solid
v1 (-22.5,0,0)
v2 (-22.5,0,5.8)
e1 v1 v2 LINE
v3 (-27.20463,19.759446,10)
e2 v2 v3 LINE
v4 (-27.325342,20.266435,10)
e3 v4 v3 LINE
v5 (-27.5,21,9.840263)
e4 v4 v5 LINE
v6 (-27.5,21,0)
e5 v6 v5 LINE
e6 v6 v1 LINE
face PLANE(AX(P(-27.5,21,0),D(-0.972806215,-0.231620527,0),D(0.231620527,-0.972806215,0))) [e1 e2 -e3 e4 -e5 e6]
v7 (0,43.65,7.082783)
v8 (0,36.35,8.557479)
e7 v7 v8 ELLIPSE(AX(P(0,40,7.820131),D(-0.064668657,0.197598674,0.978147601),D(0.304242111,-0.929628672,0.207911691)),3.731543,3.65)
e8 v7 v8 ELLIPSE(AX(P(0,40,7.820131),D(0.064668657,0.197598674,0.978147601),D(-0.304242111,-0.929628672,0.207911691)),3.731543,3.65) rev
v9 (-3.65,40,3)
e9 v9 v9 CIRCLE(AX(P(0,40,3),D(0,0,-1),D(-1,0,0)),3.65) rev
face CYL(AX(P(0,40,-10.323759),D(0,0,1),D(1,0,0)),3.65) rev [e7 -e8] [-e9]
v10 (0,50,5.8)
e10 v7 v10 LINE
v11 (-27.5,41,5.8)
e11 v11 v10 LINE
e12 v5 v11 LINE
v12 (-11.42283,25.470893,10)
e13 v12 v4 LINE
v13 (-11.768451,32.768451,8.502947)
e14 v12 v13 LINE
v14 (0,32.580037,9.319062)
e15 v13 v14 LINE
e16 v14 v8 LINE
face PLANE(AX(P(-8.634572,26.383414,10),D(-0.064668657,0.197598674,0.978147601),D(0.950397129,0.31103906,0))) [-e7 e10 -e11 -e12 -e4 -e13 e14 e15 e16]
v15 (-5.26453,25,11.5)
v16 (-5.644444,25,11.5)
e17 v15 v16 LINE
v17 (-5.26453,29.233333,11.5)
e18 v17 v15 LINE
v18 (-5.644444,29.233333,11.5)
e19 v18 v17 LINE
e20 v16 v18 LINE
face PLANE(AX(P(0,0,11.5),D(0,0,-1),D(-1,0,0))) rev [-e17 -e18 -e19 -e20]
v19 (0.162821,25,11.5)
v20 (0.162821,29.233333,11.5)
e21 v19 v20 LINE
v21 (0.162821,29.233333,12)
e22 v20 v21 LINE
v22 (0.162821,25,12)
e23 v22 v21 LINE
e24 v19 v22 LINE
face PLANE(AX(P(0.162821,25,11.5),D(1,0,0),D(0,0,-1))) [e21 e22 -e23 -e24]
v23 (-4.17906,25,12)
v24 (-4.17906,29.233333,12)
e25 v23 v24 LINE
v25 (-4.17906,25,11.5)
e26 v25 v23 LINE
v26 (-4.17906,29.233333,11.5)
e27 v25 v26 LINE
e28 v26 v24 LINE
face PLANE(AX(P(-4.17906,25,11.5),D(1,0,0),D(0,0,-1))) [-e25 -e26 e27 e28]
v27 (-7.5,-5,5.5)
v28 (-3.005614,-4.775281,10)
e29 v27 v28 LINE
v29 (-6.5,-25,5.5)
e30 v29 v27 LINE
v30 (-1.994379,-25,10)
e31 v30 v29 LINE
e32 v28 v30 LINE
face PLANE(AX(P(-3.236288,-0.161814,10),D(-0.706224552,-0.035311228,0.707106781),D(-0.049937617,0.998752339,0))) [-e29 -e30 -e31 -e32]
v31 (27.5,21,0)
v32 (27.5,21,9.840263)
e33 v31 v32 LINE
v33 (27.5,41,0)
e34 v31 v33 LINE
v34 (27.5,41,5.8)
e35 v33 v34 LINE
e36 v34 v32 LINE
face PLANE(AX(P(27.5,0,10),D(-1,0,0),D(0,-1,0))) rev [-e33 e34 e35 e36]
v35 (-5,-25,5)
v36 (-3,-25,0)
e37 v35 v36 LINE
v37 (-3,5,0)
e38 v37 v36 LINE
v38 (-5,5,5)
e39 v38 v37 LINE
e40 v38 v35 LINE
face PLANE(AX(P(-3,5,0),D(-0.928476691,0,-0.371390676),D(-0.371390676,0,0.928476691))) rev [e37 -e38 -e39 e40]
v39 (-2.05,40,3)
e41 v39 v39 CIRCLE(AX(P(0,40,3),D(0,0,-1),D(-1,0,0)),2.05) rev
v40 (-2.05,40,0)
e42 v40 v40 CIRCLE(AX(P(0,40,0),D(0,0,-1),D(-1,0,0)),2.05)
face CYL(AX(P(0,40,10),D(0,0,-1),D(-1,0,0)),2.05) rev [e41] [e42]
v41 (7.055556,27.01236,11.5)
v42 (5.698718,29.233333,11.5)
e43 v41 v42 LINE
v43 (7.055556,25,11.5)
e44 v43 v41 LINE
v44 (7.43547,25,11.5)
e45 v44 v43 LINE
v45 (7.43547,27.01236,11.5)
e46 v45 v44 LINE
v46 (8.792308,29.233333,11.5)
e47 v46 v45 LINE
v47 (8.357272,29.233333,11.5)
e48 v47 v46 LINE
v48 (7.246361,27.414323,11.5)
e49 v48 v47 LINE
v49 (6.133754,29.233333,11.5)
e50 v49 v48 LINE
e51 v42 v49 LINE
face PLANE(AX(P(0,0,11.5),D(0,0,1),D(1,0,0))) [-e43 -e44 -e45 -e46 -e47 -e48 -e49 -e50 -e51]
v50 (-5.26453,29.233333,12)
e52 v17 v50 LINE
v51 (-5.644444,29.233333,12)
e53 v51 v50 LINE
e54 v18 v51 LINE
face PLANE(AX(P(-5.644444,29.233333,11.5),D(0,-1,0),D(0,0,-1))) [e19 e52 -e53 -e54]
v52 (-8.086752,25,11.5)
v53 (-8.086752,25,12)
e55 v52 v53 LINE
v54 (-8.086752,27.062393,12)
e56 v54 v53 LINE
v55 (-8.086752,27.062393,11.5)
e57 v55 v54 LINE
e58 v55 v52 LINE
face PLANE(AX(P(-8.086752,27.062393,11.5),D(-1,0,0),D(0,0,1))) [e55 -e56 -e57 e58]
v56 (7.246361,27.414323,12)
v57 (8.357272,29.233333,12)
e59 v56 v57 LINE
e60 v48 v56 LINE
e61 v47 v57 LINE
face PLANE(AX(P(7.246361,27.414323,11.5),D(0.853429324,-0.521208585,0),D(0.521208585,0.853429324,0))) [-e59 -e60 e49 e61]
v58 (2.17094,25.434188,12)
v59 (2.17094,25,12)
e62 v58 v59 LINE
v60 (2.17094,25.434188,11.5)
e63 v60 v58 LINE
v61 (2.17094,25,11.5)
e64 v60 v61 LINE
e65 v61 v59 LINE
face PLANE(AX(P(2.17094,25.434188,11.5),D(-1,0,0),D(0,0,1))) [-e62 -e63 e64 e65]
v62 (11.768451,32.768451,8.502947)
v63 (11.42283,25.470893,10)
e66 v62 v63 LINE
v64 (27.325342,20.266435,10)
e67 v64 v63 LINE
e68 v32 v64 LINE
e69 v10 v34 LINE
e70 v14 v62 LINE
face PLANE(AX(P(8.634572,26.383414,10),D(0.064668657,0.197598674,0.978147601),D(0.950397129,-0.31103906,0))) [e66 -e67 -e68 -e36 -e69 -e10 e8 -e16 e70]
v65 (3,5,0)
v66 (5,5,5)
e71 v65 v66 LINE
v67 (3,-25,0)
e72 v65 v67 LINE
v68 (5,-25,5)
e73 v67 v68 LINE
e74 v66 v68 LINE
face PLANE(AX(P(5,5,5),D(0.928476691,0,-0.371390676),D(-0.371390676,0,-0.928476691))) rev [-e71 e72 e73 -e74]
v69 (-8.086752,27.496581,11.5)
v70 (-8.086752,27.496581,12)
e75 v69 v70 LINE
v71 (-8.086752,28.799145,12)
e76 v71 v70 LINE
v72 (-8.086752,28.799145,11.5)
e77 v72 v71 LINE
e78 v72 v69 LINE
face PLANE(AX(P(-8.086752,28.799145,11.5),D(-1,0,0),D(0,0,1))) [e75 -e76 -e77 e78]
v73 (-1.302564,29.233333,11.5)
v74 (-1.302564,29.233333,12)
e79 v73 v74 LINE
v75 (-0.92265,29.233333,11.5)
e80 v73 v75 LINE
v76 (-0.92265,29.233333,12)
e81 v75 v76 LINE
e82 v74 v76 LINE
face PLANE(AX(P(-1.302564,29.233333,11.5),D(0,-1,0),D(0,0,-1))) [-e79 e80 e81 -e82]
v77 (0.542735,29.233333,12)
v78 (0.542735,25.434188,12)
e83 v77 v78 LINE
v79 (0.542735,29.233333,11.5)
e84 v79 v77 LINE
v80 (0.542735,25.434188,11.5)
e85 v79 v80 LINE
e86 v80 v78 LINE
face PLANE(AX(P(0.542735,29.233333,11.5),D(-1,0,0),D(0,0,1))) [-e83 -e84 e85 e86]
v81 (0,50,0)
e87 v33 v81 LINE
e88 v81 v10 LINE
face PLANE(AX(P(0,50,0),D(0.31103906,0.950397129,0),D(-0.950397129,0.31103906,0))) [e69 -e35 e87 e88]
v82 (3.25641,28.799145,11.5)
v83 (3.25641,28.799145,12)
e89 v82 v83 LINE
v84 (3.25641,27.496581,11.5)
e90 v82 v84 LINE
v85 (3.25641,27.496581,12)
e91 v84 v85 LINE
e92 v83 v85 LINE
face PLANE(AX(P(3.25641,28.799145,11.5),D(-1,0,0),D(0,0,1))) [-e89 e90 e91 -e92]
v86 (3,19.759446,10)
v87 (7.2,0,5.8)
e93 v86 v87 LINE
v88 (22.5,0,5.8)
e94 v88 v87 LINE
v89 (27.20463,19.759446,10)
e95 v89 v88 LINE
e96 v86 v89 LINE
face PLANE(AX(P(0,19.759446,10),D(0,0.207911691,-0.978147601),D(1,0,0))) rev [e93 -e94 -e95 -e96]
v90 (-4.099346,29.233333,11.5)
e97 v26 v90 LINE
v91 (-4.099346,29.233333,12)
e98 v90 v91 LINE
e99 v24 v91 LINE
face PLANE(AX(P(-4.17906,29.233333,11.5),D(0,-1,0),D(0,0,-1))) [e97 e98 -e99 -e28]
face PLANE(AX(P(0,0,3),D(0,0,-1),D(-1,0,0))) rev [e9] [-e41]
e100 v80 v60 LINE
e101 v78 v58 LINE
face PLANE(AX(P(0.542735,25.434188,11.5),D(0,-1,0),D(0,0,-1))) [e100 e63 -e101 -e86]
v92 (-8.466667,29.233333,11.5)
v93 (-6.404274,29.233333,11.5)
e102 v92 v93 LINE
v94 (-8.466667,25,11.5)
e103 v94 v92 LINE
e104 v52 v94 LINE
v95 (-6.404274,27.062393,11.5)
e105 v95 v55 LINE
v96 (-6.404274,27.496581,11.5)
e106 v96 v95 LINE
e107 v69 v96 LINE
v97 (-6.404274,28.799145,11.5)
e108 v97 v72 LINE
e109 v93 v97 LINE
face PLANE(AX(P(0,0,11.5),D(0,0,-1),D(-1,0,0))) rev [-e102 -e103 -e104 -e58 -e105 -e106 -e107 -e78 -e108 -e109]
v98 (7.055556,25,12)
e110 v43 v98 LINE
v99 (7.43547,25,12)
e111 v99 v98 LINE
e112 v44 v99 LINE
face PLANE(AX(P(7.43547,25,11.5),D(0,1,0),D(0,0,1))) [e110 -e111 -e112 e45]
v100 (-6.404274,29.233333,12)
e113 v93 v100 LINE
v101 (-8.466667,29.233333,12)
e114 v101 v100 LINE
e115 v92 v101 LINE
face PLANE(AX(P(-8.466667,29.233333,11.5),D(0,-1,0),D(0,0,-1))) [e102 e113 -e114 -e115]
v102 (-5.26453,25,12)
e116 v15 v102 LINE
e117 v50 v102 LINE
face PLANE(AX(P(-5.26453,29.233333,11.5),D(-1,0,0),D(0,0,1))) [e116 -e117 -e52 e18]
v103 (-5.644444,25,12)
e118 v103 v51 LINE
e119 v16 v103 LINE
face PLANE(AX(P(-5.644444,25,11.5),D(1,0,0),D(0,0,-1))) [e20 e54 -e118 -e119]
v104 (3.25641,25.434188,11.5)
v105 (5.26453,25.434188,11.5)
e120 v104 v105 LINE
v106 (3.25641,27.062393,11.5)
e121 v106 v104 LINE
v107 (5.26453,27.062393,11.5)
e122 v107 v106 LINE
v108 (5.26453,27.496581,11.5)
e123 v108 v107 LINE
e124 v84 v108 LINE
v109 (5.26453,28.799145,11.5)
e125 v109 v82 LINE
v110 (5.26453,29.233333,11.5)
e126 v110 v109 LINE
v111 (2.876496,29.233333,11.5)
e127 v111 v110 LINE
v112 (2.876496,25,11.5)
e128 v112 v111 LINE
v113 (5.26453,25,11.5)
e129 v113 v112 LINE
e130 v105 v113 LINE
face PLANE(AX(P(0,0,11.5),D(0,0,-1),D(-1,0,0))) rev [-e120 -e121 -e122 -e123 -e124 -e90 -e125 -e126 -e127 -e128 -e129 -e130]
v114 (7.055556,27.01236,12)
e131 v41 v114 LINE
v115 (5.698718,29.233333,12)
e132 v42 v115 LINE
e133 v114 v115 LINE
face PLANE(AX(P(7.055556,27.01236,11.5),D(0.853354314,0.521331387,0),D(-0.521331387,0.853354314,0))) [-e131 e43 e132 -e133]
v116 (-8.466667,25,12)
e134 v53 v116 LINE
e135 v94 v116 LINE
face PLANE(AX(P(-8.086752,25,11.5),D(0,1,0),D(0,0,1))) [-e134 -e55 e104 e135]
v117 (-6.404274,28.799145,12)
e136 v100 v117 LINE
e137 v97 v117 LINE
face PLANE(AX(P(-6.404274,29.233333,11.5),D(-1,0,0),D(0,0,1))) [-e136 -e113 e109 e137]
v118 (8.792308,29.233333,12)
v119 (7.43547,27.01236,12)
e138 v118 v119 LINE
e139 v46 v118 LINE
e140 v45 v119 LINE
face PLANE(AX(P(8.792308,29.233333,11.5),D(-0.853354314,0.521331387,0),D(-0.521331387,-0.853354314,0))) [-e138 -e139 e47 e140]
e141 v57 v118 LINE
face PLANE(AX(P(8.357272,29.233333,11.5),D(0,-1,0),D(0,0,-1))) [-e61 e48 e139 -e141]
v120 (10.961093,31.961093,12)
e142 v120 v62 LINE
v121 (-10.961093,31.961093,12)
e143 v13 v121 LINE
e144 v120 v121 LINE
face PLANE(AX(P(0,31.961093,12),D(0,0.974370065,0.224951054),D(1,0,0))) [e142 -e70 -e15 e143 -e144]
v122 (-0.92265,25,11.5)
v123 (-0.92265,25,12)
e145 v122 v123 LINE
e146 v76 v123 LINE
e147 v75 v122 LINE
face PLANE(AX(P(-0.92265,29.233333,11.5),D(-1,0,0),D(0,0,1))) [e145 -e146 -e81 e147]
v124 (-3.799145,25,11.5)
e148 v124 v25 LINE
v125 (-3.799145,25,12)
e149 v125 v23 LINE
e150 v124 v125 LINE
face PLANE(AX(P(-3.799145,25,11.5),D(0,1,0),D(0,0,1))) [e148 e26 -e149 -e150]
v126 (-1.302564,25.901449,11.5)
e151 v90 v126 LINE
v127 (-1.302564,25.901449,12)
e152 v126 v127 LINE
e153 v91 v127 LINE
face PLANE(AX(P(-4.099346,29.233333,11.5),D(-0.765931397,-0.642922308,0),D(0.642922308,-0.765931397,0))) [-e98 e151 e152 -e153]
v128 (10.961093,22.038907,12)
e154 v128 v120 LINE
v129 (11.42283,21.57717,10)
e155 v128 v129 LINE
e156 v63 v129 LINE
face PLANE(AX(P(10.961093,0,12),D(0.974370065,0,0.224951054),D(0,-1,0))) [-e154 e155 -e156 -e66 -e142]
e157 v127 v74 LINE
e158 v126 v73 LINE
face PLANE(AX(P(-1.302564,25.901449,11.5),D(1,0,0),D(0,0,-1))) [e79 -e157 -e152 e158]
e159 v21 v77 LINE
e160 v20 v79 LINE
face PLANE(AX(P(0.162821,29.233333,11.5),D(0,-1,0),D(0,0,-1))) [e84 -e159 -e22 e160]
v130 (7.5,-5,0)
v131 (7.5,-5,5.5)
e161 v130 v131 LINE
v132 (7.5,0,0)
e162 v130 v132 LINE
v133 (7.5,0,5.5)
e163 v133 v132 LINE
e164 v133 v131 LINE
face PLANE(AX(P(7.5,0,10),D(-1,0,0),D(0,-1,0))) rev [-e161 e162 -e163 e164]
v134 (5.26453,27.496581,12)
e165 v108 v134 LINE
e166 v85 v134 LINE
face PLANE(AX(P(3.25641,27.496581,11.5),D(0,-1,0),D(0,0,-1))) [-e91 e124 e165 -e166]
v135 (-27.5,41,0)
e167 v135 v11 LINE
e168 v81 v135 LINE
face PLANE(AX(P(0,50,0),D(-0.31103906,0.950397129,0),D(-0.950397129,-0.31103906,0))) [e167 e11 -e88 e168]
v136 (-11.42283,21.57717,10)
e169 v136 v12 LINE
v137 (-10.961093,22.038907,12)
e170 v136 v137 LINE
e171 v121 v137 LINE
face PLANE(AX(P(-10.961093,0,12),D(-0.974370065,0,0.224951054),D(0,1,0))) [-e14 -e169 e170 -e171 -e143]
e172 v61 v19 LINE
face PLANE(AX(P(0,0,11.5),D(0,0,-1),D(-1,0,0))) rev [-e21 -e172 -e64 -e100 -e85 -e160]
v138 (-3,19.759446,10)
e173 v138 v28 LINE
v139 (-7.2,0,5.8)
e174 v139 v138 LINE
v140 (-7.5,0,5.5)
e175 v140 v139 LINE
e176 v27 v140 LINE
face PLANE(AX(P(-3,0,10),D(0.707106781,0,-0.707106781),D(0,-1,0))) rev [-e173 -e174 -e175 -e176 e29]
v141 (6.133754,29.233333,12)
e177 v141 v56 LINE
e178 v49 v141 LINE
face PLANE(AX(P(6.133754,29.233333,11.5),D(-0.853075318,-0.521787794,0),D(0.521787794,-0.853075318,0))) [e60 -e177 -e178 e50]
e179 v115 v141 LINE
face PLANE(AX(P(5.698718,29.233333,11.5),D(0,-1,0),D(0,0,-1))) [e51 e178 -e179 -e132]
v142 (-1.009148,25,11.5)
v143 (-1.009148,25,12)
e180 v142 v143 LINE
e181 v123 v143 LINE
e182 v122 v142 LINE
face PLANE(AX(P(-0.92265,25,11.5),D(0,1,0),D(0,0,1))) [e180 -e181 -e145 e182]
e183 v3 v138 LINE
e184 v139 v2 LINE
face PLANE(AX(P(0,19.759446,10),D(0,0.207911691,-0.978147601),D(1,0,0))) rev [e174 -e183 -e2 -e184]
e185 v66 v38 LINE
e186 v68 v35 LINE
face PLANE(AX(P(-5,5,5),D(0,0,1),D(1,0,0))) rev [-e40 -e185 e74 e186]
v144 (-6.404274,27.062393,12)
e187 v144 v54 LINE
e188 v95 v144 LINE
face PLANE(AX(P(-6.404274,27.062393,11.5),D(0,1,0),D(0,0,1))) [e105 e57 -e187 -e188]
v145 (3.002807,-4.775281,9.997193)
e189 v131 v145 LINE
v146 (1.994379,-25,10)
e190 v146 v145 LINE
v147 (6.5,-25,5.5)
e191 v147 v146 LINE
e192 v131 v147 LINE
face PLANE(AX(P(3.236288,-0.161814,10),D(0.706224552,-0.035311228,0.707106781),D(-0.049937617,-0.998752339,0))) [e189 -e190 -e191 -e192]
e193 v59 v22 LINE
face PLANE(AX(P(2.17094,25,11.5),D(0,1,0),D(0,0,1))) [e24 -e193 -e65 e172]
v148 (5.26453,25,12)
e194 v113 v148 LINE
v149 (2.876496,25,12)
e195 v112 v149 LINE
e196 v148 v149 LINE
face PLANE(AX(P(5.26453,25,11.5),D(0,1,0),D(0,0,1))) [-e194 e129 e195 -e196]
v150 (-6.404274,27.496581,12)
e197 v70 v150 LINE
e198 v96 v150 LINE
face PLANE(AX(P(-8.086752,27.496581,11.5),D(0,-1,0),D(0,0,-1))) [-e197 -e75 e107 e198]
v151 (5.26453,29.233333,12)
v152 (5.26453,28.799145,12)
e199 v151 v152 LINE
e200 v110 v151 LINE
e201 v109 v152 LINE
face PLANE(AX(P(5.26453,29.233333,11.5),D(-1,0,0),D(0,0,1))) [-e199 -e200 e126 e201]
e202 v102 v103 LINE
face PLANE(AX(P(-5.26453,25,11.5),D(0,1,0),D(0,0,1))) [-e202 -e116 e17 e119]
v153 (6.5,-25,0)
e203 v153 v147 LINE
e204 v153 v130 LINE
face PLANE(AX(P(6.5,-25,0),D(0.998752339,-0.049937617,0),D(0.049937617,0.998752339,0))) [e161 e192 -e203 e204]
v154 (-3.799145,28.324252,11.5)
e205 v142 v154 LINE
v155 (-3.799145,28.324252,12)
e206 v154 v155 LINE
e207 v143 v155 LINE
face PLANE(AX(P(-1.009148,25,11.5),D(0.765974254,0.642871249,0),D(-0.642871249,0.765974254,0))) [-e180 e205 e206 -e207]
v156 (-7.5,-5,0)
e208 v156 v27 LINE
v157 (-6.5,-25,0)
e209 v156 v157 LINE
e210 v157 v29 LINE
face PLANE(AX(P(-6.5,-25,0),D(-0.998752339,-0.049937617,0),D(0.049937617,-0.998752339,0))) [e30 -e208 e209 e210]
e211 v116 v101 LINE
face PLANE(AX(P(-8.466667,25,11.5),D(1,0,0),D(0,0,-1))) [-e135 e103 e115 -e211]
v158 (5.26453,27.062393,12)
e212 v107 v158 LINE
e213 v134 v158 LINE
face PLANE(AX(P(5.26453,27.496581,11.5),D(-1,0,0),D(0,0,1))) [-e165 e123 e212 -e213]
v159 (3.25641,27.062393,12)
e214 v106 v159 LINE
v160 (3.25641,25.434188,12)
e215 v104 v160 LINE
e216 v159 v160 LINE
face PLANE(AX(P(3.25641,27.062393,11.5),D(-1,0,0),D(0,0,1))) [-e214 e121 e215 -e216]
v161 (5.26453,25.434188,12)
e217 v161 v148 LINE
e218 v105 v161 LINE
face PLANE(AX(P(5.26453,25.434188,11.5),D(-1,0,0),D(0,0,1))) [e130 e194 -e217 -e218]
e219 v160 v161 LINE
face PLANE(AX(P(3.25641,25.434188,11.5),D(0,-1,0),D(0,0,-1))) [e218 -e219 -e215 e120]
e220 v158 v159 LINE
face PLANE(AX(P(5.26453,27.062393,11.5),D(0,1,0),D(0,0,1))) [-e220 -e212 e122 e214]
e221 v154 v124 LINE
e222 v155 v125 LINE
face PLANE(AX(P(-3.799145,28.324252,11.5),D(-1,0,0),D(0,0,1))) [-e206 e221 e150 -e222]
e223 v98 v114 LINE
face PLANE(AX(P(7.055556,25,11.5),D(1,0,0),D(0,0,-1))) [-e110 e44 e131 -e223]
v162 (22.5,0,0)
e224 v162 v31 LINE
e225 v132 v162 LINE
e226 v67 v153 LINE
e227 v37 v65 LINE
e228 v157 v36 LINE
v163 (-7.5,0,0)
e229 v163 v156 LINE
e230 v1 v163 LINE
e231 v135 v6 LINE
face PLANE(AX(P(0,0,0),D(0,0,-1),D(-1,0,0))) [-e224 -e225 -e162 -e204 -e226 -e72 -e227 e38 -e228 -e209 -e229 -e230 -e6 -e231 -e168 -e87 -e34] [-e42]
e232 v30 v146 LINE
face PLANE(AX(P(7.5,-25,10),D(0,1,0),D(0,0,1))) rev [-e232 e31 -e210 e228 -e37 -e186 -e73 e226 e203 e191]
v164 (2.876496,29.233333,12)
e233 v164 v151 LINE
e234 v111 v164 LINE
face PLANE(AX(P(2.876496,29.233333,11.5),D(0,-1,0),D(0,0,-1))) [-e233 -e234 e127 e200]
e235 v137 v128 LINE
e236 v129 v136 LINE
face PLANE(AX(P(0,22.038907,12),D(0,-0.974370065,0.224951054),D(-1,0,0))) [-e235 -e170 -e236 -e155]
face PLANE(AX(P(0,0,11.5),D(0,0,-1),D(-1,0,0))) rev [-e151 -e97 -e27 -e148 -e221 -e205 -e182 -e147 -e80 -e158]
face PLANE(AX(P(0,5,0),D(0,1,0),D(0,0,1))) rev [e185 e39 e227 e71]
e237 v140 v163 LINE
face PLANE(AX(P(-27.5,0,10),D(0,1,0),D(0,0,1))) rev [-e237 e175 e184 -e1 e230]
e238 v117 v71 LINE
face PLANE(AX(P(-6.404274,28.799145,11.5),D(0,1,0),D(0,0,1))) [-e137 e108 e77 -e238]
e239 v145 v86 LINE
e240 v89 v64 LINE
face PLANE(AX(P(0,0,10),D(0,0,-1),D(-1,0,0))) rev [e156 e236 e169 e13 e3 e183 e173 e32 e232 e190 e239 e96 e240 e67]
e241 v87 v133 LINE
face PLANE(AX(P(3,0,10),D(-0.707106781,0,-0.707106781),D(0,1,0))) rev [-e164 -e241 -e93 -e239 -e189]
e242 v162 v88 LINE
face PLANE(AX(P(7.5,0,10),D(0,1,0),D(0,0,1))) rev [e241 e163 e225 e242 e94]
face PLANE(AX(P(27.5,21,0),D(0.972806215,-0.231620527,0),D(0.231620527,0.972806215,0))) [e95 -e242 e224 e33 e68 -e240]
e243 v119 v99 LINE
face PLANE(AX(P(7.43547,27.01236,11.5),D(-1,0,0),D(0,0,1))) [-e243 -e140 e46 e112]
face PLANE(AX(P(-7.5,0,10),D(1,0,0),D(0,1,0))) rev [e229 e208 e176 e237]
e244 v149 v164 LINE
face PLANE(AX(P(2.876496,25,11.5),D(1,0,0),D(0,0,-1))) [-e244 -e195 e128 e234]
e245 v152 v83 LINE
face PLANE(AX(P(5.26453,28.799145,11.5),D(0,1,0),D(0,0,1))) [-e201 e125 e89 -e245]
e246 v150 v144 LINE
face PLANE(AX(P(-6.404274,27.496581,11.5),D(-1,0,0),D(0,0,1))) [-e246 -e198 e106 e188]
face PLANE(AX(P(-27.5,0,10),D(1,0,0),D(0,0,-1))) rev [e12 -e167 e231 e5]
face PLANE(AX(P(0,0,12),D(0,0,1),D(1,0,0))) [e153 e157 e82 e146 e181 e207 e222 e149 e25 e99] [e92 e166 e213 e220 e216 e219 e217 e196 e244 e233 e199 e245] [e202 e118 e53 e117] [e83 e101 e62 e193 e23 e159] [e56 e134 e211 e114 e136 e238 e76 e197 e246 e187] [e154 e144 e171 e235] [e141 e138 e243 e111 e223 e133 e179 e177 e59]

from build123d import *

# Parameters (mm, degrees)
BOSS_EXTRUDE1_DEPTH  = 10
SKETCH3_OUTSIDE_W    = 75.708
SKETCH3_OUTSIDE_H    = 95.708
SHAPE_CUTS_DEPTH     = 58.933151131
DOVE_TAIL_DEPTH      = 30
SKETCH5_R            = 2.05
FASTENER_DEPTH       = 58.933151131
SKETCH7_R            = 3.65
CUT_EXTRUDE4_DEPTH   = 7
SKETCH8_W            = 24
SKETCH8_H            = 12
NAMES_PLATE_DEPTH    = 2
CHAMFER1_SIZE        = 4.2
CHAMFER1_SIZE_2      = 19.75944646
CHAMFER2_SIZE        = 4.5
CHAMFER3_SIZE        = 4.5
CHAMFER3_SIZE_2      = 1.03890686
SKETCH9_W            = 0.379914529
SKETCH9_H            = 4.233333333
AVA_NAME_PRINT_DEPTH = 0.5


with BuildPart() as part:
    # Sketch2 → Boss-Extrude1 (new body)
    with BuildSketch(Plane.XY):
        Polygon((7.5, 0), (27.5, 0), (27.5, 50), (-27.5, 50), (-27.5, 0), (-7.5, 0), (-7.5, -25), (7.5, -25), align=None)
    extrude(amount=BOSS_EXTRUDE1_DEPTH)

    # Sketch3 outside → Shape cuts (cut, through all)
    with BuildSketch(Plane.XY.offset(10)):
        with Locations((0, 12.5)):
            Rectangle(SKETCH3_OUTSIDE_W, SKETCH3_OUTSIDE_H)
        Polygon((-6.5, -25), (-7.5, -5), (-7.5, 0), (-22.5, 0), (-27.5, 21), (-27.5, 41), (0, 50), (27.5, 41), (27.5, 21), (22.5, 0), (7.5, 0), (7.5, -5), (6.5, -25), align=None, mode=Mode.SUBTRACT)
    extrude(amount=-SHAPE_CUTS_DEPTH, mode=Mode.SUBTRACT)

    # Sketch4 → Dove tail (cut)
    with BuildSketch(Plane.XZ.offset(25)):
        Polygon((-5, 5), (5, 5), (3, 0), (-3, 0), align=None)
    extrude(amount=-DOVE_TAIL_DEPTH, mode=Mode.SUBTRACT)

    # Sketch5 → Fastener (cut, through all)
    with BuildSketch(Plane(origin=(0, 0, 0), x_dir=(-1, 0, 0), z_dir=(0, 0, -1))):
        with Locations((0, 40)):
            Circle(SKETCH5_R)
    extrude(amount=-FASTENER_DEPTH, mode=Mode.SUBTRACT)

    # Sketch7 → Cut-Extrude4 (cut)
    with BuildSketch(Plane.XY.offset(10)):
        with Locations((0, 40)):
            Circle(SKETCH7_R)
    extrude(amount=-CUT_EXTRUDE4_DEPTH, mode=Mode.SUBTRACT)

    # Sketch8 → Names Plate (add)
    with BuildSketch(Plane.XY.offset(10)):
        with Locations((0, 27)):
            Rectangle(SKETCH8_W, SKETCH8_H)
    extrude(amount=NAMES_PLATE_DEPTH)

    # Chamfer1
    # the kernel refuses this chamfer: 19.75944646, 4.2 mm, written as the material it takes off along each edge
    with BuildSketch(Plane(origin=(-43.83302561, 0, 10), x_dir=(0, -0.17442650951506392, -0.9846701949274139), z_dir=(1, 0, 0))) as chamfer1_piece_1_section:
        Polygon((CHAMFER1_SIZE * 0.984670194927, CHAMFER1_SIZE * 0.174426509515), (-CHAMFER1_SIZE_2 * 0.174426509513, CHAMFER1_SIZE_2 * 0.984670194918), (0, 0), align=None)
    chamfer1_piece_1 = extrude(amount=117.66605122, mode=Mode.PRIVATE)
    chamfer1_piece_1 = split(chamfer1_piece_1, bisect_by=Plane(origin=(-7.5, 6.987243294, 8.814531777), z_dir=(-1, 0, 0)), keep=Keep.TOP, mode=Mode.PRIVATE)
    add(chamfer1_piece_1, mode=Mode.SUBTRACT)
    with BuildSketch(Plane(origin=(7.5, 0, 10), x_dir=(0, -0.17442650951506392, -0.9846701949274139), z_dir=(1, 0, 0))) as chamfer1_piece_2:
        Polygon((CHAMFER1_SIZE * 0.984670194927, CHAMFER1_SIZE * 0.174426509515), (-CHAMFER1_SIZE_2 * 0.174426509513, CHAMFER1_SIZE_2 * 0.984670194918), (0, 0), align=None)
    extrude(amount=66.33302561, mode=Mode.SUBTRACT)
    with BuildSketch(Plane(origin=(-73.83302561, 0, 10), x_dir=(0, 0.9999679748920759, 0.008003073799517023), z_dir=(1, 0, 0))) as chamfer1_piece_3:
        Polygon((CHAMFER1_SIZE_2 * 0.999967974882, -CHAMFER1_SIZE_2 * 0.00800307379944), (-CHAMFER1_SIZE * 0.00800307379952, -CHAMFER1_SIZE * 0.999967974892), (0, 0), align=None)
    extrude(amount=66.33302561, mode=Mode.SUBTRACT)
    with BuildSketch(Plane(origin=(-73.83302561, 0, 10), x_dir=(0, 0.9999679748920759, 0.008003073799517023), z_dir=(1, 0, 0))) as chamfer1_piece_4_section:
        Polygon((CHAMFER1_SIZE_2 * 0.999967974882, -CHAMFER1_SIZE_2 * 0.00800307379944), (-CHAMFER1_SIZE * 0.00800307379952, -CHAMFER1_SIZE * 0.999967974892), (0, 0), align=None)
    chamfer1_piece_4 = extrude(amount=117.66605122, mode=Mode.PRIVATE)
    chamfer1_piece_4 = split(chamfer1_piece_4, bisect_by=Plane(origin=(7.5, 6.987243294, 8.814531777), z_dir=(1, 0, 0)), keep=Keep.TOP, mode=Mode.PRIVATE)
    add(chamfer1_piece_4, mode=Mode.SUBTRACT)
    with BuildSketch(Plane(origin=(-76.286760165, 25.033423946, 10), x_dir=(0.3110290993551473, -0.9503666924740605, 0.008003073799517025), z_dir=(0.9503971290446889, 0.31103906041462565, 0))) as chamfer1_piece_5_section:
        Polygon((CHAMFER1_SIZE_2 * 0.999967974882, CHAMFER1_SIZE_2 * 0.00800307379944), (-CHAMFER1_SIZE * 0.00800307379952, CHAMFER1_SIZE * 0.999967974892), (0, 0), align=None)
    chamfer1_piece_5 = extrude(amount=131.601323812, mode=Mode.PRIVATE)
    chamfer1_piece_5 = split(chamfer1_piece_5, bisect_by=Plane(origin=(-50.474654782, 33, 8.986769107), z_dir=(0, -1, 0)), keep=Keep.TOP, mode=Mode.PRIVATE)
    chamfer1_piece_5 = split(chamfer1_piece_5, bisect_by=Plane(origin=(-12, 24.582378236, 8.986769107), z_dir=(-1, 0, 0)), keep=Keep.TOP, mode=Mode.PRIVATE)
    add(chamfer1_piece_5, mode=Mode.SUBTRACT)
    with BuildSketch(Plane(origin=(-76.286760165, 25.033423946, 10), x_dir=(0.3110290993551473, -0.9503666924740605, 0.008003073799517025), z_dir=(0.9503971290446889, 0.31103906041462565, 0))) as chamfer1_piece_6_section:
        Polygon((CHAMFER1_SIZE_2 * 0.999967974882, CHAMFER1_SIZE_2 * 0.00800307379944), (-CHAMFER1_SIZE * 0.00800307379952, CHAMFER1_SIZE * 0.999967974892), (0, 0), align=None)
    chamfer1_piece_6 = extrude(amount=131.601323812, mode=Mode.PRIVATE)
    chamfer1_piece_6 = split(chamfer1_piece_6, bisect_by=Plane(origin=(-26.699133226, 33, 8.380574439), z_dir=(0, 1, 0)), keep=Keep.TOP, mode=Mode.PRIVATE)
    chamfer1_piece_6 = split(chamfer1_piece_6, bisect_by=Plane(origin=(-12, 37.810625419, 8.380574439), z_dir=(-1, 0, 0)), keep=Keep.TOP, mode=Mode.PRIVATE)
    add(chamfer1_piece_6, mode=Mode.SUBTRACT)
    with BuildSketch(Plane(origin=(-76.286760165, 25.033423946, 10), x_dir=(0.3110290993551473, -0.9503666924740605, 0.008003073799517025), z_dir=(0.9503971290446889, 0.31103906041462565, 0))) as chamfer1_piece_7_section:
        Polygon((CHAMFER1_SIZE_2 * 0.999967974882, CHAMFER1_SIZE_2 * 0.00800307379944), (-CHAMFER1_SIZE * 0.00800307379952, CHAMFER1_SIZE * 0.999967974892), (0, 0), align=None)
    chamfer1_piece_7 = extrude(amount=131.601323812, mode=Mode.PRIVATE)
    chamfer1_piece_7 = split(chamfer1_piece_7, bisect_by=Plane(origin=(20.226611315, 33, 8.796706838), z_dir=(0, 1, 0)), keep=Keep.TOP, mode=Mode.PRIVATE)
    chamfer1_piece_7 = split(chamfer1_piece_7, bisect_by=Plane(origin=(-12, 49.436791762, 8.796706838), z_dir=(1, 0, 0)), keep=Keep.TOP, mode=Mode.PRIVATE)
    add(chamfer1_piece_7, mode=Mode.SUBTRACT)
    with BuildSketch(Plane(origin=(-48.786760165, 65.966576054, 10), x_dir=(-0.3110290993551472, -0.9503666924740605, 0.008003073799517025), z_dir=(0.9503971290446889, -0.31103906041462565, 0))) as chamfer1_piece_8_section:
        Polygon((CHAMFER1_SIZE_2 * 0.999967974882, CHAMFER1_SIZE_2 * 0.00800307379944), (-CHAMFER1_SIZE * 0.00800307379952, CHAMFER1_SIZE * 0.999967974892), (0, 0), align=None)
    chamfer1_piece_8 = extrude(amount=131.601323812, mode=Mode.PRIVATE)
    chamfer1_piece_8 = split(chamfer1_piece_8, bisect_by=Plane(origin=(12, 49.436791762, 8.796706838), z_dir=(-1, 0, 0)), keep=Keep.TOP, mode=Mode.PRIVATE)
    chamfer1_piece_8 = split(chamfer1_piece_8, bisect_by=Plane(origin=(-20.226611315, 33, 8.796706838), z_dir=(0, 1, 0)), keep=Keep.TOP, mode=Mode.PRIVATE)
    add(chamfer1_piece_8, mode=Mode.SUBTRACT)
    with BuildSketch(Plane(origin=(-48.786760165, 65.966576054, 10), x_dir=(-0.3110290993551472, -0.9503666924740605, 0.008003073799517025), z_dir=(0.9503971290446889, -0.31103906041462565, 0))) as chamfer1_piece_9_section:
        Polygon((CHAMFER1_SIZE_2 * 0.999967974882, CHAMFER1_SIZE_2 * 0.00800307379944), (-CHAMFER1_SIZE * 0.00800307379952, CHAMFER1_SIZE * 0.999967974892), (0, 0), align=None)
    chamfer1_piece_9 = extrude(amount=131.601323812, mode=Mode.PRIVATE)
    chamfer1_piece_9 = split(chamfer1_piece_9, bisect_by=Plane(origin=(12, 37.810625419, 8.380574439), z_dir=(1, 0, 0)), keep=Keep.TOP, mode=Mode.PRIVATE)
    chamfer1_piece_9 = split(chamfer1_piece_9, bisect_by=Plane(origin=(26.699133226, 33, 8.380574439), z_dir=(0, 1, 0)), keep=Keep.TOP, mode=Mode.PRIVATE)
    add(chamfer1_piece_9, mode=Mode.SUBTRACT)
    with BuildSketch(Plane(origin=(-48.786760165, 65.966576054, 10), x_dir=(-0.3110290993551472, -0.9503666924740605, 0.008003073799517025), z_dir=(0.9503971290446889, -0.31103906041462565, 0))) as chamfer1_piece_10_section:
        Polygon((CHAMFER1_SIZE_2 * 0.999967974882, CHAMFER1_SIZE_2 * 0.00800307379944), (-CHAMFER1_SIZE * 0.00800307379952, CHAMFER1_SIZE * 0.999967974892), (0, 0), align=None)
    chamfer1_piece_10 = extrude(amount=131.601323812, mode=Mode.PRIVATE)
    chamfer1_piece_10 = split(chamfer1_piece_10, bisect_by=Plane(origin=(12, 24.582378236, 8.986769107), z_dir=(1, 0, 0)), keep=Keep.TOP, mode=Mode.PRIVATE)
    chamfer1_piece_10 = split(chamfer1_piece_10, bisect_by=Plane(origin=(50.474654782, 33, 8.986769107), z_dir=(0, -1, 0)), keep=Keep.TOP, mode=Mode.PRIVATE)
    add(chamfer1_piece_10, mode=Mode.SUBTRACT)

    # Chamfer2
    # the kernel refuses this chamfer: 4.5 mm, written as the material it adds along each edge
    # the kernel refuses this chamfer: 4.5 mm, written as the material it takes off along each edge
    with BuildSketch(Plane(origin=(-7.5, 31.332019906, 10), x_dir=(0.9996219169112966, 8.91002913121734e-15, 0.02749587661058639), z_dir=(0, -1, 0))) as chamfer2_2_piece_1_section:
        Polygon((CHAMFER2_SIZE * 0.999621916911, -CHAMFER2_SIZE * 0.0274958766106), (-CHAMFER2_SIZE * 0.0274958766106, -CHAMFER2_SIZE * 0.999621916911), (0, 0), align=None)
    chamfer2_2_piece_1 = extrude(amount=47.904593352, mode=Mode.PRIVATE)
    chamfer2_2_piece_1 = split(chamfer2_2_piece_1, bisect_by=Plane(origin=(-7.425, 0, 5.65), z_dir=(0, -1, 0)), keep=Keep.TOP, mode=Mode.PRIVATE)
    add(chamfer2_2_piece_1, mode=Mode.SUBTRACT)
    with BuildSketch(Plane(origin=(-7.5, 31.332019906, 10), x_dir=(0.9996219169112966, 8.91002913121734e-15, 0.02749587661058639), z_dir=(0, -1, 0))) as chamfer2_2_piece_2_section:
        Polygon((CHAMFER2_SIZE * 0.999621916911, -CHAMFER2_SIZE * 0.0274958766106), (-CHAMFER2_SIZE * 0.0274958766106, -CHAMFER2_SIZE * 0.999621916911), (0, 0), align=None)
    chamfer2_2_piece_2 = extrude(amount=47.904593352, mode=Mode.PRIVATE)
    chamfer2_2_piece_2 = split(chamfer2_2_piece_2, bisect_by=Plane(origin=(-5.791935484, 7.646978201, 7.425415393), z_dir=(0, -0.20791169081730007, 0.9781476007339034)), keep=Keep.TOP, mode=Mode.PRIVATE)
    add(chamfer2_2_piece_2, mode=Mode.SUBTRACT)
    with BuildSketch(Plane(origin=(7.5, 31.332019906, 10), x_dir=(0.02749587661058639, 1.490299200723227e-13, -0.9996219169112966), z_dir=(0, -1, 0))) as chamfer2_2_piece_3_section:
        Polygon((CHAMFER2_SIZE * 0.999621916911, -CHAMFER2_SIZE * 0.0274958766106), (-CHAMFER2_SIZE * 0.0274958766106, -CHAMFER2_SIZE * 0.999621916911), (0, 0), align=None)
    chamfer2_2_piece_3 = extrude(amount=47.904593351, mode=Mode.PRIVATE)
    chamfer2_2_piece_3 = split(chamfer2_2_piece_3, bisect_by=Plane(origin=(5.791935484, 7.646978201, 7.425415393), z_dir=(0, -0.20791169081730007, 0.9781476007339034)), keep=Keep.TOP, mode=Mode.PRIVATE)
    add(chamfer2_2_piece_3, mode=Mode.SUBTRACT)
    with BuildSketch(Plane(origin=(7.5, 31.332019906, 10), x_dir=(0.02749587661058639, 1.490299200723227e-13, -0.9996219169112966), z_dir=(0, -1, 0))) as chamfer2_2_piece_4_section:
        Polygon((CHAMFER2_SIZE * 0.999621916911, -CHAMFER2_SIZE * 0.0274958766106), (-CHAMFER2_SIZE * 0.0274958766106, -CHAMFER2_SIZE * 0.999621916911), (0, 0), align=None)
    chamfer2_2_piece_4 = extrude(amount=47.904593351, mode=Mode.PRIVATE)
    chamfer2_2_piece_4 = split(chamfer2_2_piece_4, bisect_by=Plane(origin=(7.425, 0, 5.65), z_dir=(0, -1, 0)), keep=Keep.TOP, mode=Mode.PRIVATE)
    add(chamfer2_2_piece_4, mode=Mode.SUBTRACT)
    with BuildSketch(Plane(origin=(-5.92209326, -36.558134796, 10), x_dir=(0.9983747275087121, 0.04991873637543544, 0.02749587661058639), z_dir=(-0.049937616943892066, 0.9987523388778448, 0))) as chamfer2_2_piece_5_section:
        Polygon((CHAMFER2_SIZE * 0.999621916911, CHAMFER2_SIZE * 0.0274958766106), (-CHAMFER2_SIZE * 0.0274958766106, CHAMFER2_SIZE * 0.999621916911), (0, 0), align=None)
    chamfer2_2_piece_5 = extrude(amount=43.170131286, mode=Mode.PRIVATE)
    chamfer2_2_piece_5 = split(chamfer2_2_piece_5, bisect_by=Plane(origin=(-5.601535176, -11.523039788, 3.350702283), z_dir=(0, -0.20791169081730007, 0.9781476007339034)), keep=Keep.TOP, mode=Mode.PRIVATE)
    add(chamfer2_2_piece_5, mode=Mode.SUBTRACT)
    with BuildSketch(Plane(origin=(-5.92209326, -36.558134796, 10), x_dir=(0.9983747275087121, 0.04991873637543544, 0.02749587661058639), z_dir=(-0.049937616943892066, 0.9987523388778448, 0))) as chamfer2_2_piece_6_section:
        Polygon((CHAMFER2_SIZE * 0.999621916911, CHAMFER2_SIZE * 0.0274958766106), (-CHAMFER2_SIZE * 0.0274958766106, CHAMFER2_SIZE * 0.999621916911), (0, 0), align=None)
    chamfer2_2_piece_6 = extrude(amount=43.170131286, mode=Mode.PRIVATE)
    chamfer2_2_piece_6 = split(chamfer2_2_piece_6, bisect_by=Plane(origin=(-7.487406309, 0, 5.770981551), z_dir=(0, -1, 0)), keep=Keep.TOP, mode=Mode.PRIVATE)
    add(chamfer2_2_piece_6, mode=Mode.SUBTRACT)
    with BuildSketch(Plane(origin=(8.07790674, 6.558134796, 10), x_dir=(-0.9983747275087121, 0.04991873637543566, 0.02749587661058639), z_dir=(-0.04993761694389229, -0.9987523388778448, 0))) as chamfer2_2_piece_7_section:
        Polygon((CHAMFER2_SIZE * 0.999621916911, CHAMFER2_SIZE * 0.0274958766106), (-CHAMFER2_SIZE * 0.0274958766106, CHAMFER2_SIZE * 0.999621916911), (0, 0), align=None)
    chamfer2_2_piece_7 = extrude(amount=43.170131286, mode=Mode.PRIVATE)
    chamfer2_2_piece_7 = split(chamfer2_2_piece_7, bisect_by=Plane(origin=(6.100176862, 3.64296483, 6.574336079), z_dir=(0, -0.20791169081730007, 0.9781476007339034)), keep=Keep.TOP, mode=Mode.PRIVATE)
    add(chamfer2_2_piece_7, mode=Mode.SUBTRACT)
    with BuildSketch(Plane(origin=(8.07790674, 6.558134796, 10), x_dir=(-0.9983747275087121, 0.04991873637543566, 0.02749587661058639), z_dir=(-0.04993761694389229, -0.9987523388778448, 0))) as chamfer2_2_piece_8_section:
        Polygon((CHAMFER2_SIZE * 0.999621916911, CHAMFER2_SIZE * 0.0274958766106), (-CHAMFER2_SIZE * 0.0274958766106, CHAMFER2_SIZE * 0.999621916911), (0, 0), align=None)
    chamfer2_2_piece_8 = extrude(amount=43.170131286, mode=Mode.PRIVATE)
    chamfer2_2_piece_8 = split(chamfer2_2_piece_8, bisect_by=Plane(origin=(7.487406309, 0, 5.770981551), z_dir=(0, -1, 0)), keep=Keep.TOP, mode=Mode.PRIVATE)
    add(chamfer2_2_piece_8, mode=Mode.SUBTRACT)

    # Chamfer3
    # the kernel refuses this chamfer: 4.5, 1.03890686 mm, written as the material it takes off along each edge
    with BuildSketch(Plane(origin=(-23.688904863, 33, 12), x_dir=(0, 0.008660176093277927, -0.9999624999718906), z_dir=(1, 0, 0))) as chamfer3_piece_1_section:
        Polygon((CHAMFER3_SIZE * 0.999962499972, -CHAMFER3_SIZE * 0.00866017609328), (-CHAMFER3_SIZE_2 * 0.00866017609382, -CHAMFER3_SIZE_2 * 0.999962500034), (0, 0), align=None)
    chamfer3_piece_1 = extrude(amount=47.377809727, mode=Mode.PRIVATE)
    chamfer3_piece_1 = split(chamfer3_piece_1, bisect_by=Plane(origin=(-15.747387657, 32.981610324, 10.27905167), z_dir=(-0.06466865696139155, -0.19759867404852308, -0.9781476007336907)), keep=Keep.TOP, mode=Mode.PRIVATE)
    chamfer3_piece_1 = split(chamfer3_piece_1, bisect_by=Plane(origin=(-15.724323898, 32.577762011, 8.279932697), z_dir=(-0.06466865696139155, 0.19759867404852308, 0.9781476007336907)), keep=Keep.TOP, mode=Mode.PRIVATE)
    add(chamfer3_piece_1, mode=Mode.SUBTRACT)
    with BuildSketch(Plane(origin=(-23.688904863, 33, 12), x_dir=(0, 0.008660176093277927, -0.9999624999718906), z_dir=(1, 0, 0))) as chamfer3_piece_2_section:
        Polygon((CHAMFER3_SIZE * 0.999962499972, -CHAMFER3_SIZE * 0.00866017609328), (-CHAMFER3_SIZE_2 * 0.00866017609382, -CHAMFER3_SIZE_2 * 0.999962500034), (0, 0), align=None)
    chamfer3_piece_2 = extrude(amount=47.377809727, mode=Mode.PRIVATE)
    chamfer3_piece_2 = split(chamfer3_piece_2, bisect_by=Plane(origin=(15.724323898, 32.577762011, 8.279932697), z_dir=(0.06466865696139155, 0.19759867404852308, 0.9781476007336907)), keep=Keep.TOP, mode=Mode.PRIVATE)
    chamfer3_piece_2 = split(chamfer3_piece_2, bisect_by=Plane(origin=(15.747387657, 32.981610324, 10.27905167), z_dir=(0.06466865696139155, -0.19759867404852308, -0.9781476007336907)), keep=Keep.TOP, mode=Mode.PRIVATE)
    add(chamfer3_piece_2, mode=Mode.SUBTRACT)
    with BuildSketch(Plane(origin=(-23.688904863, 33, 12), x_dir=(0, 0.008660176093277927, -0.9999624999718906), z_dir=(1, 0, 0))) as chamfer3_piece_3_section:
        Polygon((CHAMFER3_SIZE * 0.999962499972, -CHAMFER3_SIZE * 0.00866017609328), (-CHAMFER3_SIZE_2 * 0.00866017609382, -CHAMFER3_SIZE_2 * 0.999962500034), (0, 0), align=None)
    chamfer3_piece_3 = extrude(amount=47.377809727, mode=Mode.PRIVATE)
    chamfer3_piece_3 = split(chamfer3_piece_3, bisect_by=Plane(origin=(-0.116574835, 32.257698924, 9.391885215), z_dir=(0.06466865696139155, 0.19759867404852308, 0.9781476007336907)), keep=Keep.TOP, mode=Mode.PRIVATE)
    chamfer3_piece_3 = split(chamfer3_piece_3, bisect_by=Plane(origin=(0.116574835, 32.257698924, 9.391885215), z_dir=(-0.06466865696139155, 0.19759867404852308, 0.9781476007336907)), keep=Keep.TOP, mode=Mode.PRIVATE)
    add(chamfer3_piece_3, mode=Mode.SUBTRACT)
    with BuildSketch(Plane(origin=(12, 44.688904863, 12), x_dir=(-0.9870549888826571, 0, 0.1603821963992814), z_dir=(0, -1, 0))) as chamfer3_piece_4_section:
        Polygon((CHAMFER3_SIZE_2 * 0.987054988944, CHAMFER3_SIZE_2 * 0.160382196409), (-CHAMFER3_SIZE * 0.160382196399, CHAMFER3_SIZE * 0.987054988883), (0, 0), align=None)
    chamfer3_piece_4 = extrude(amount=35.377809727, mode=Mode.PRIVATE)
    chamfer3_piece_4 = split(chamfer3_piece_4, bisect_by=Plane(origin=(11.440207801, 31.525379387, 8.775765274), z_dir=(0.06466865696139155, 0.19759867404852308, 0.9781476007336907)), keep=Keep.TOP, mode=Mode.PRIVATE)
    chamfer3_piece_4 = split(chamfer3_piece_4, bisect_by=Plane(origin=(11.602096163, 32.020038273, 10), z_dir=(0, 0, 1)), keep=Keep.TOP, mode=Mode.PRIVATE)
    add(chamfer3_piece_4, mode=Mode.SUBTRACT)
    with BuildSketch(Plane(origin=(12, 44.688904863, 12), x_dir=(-0.9870549888826571, 0, 0.1603821963992814), z_dir=(0, -1, 0))) as chamfer3_piece_5_section:
        Polygon((CHAMFER3_SIZE_2 * 0.987054988944, CHAMFER3_SIZE_2 * 0.160382196409), (-CHAMFER3_SIZE * 0.160382196399, CHAMFER3_SIZE * 0.987054988883), (0, 0), align=None)
    chamfer3_piece_5 = extrude(amount=35.377809727, mode=Mode.PRIVATE)
    chamfer3_piece_5 = split(chamfer3_piece_5, bisect_by=Plane(origin=(11.75860092, 36.766980835, 7.695842826), z_dir=(0.06466865696139155, 0.19759867404852308, 0.9781476007336907)), keep=Keep.TOP, mode=Mode.PRIVATE)
    chamfer3_piece_5 = split(chamfer3_piece_5, bisect_by=Plane(origin=(11.856026743, 37.064670851, 10), z_dir=(0, 0, -1)), keep=Keep.TOP, mode=Mode.PRIVATE)
    add(chamfer3_piece_5, mode=Mode.SUBTRACT)
    with BuildSketch(Plane(origin=(12, 44.688904863, 12), x_dir=(-0.9870549888826571, 0, 0.1603821963992814), z_dir=(0, -1, 0))) as chamfer3_piece_6_section:
        Polygon((CHAMFER3_SIZE_2 * 0.987054988944, CHAMFER3_SIZE_2 * 0.160382196409), (-CHAMFER3_SIZE * 0.160382196399, CHAMFER3_SIZE * 0.987054988883), (0, 0), align=None)
    chamfer3_piece_6 = extrude(amount=35.377809727, mode=Mode.PRIVATE)
    chamfer3_piece_6 = split(chamfer3_piece_6, bisect_by=Plane(origin=(11.705305569, 15.149533813, 12.066374843), z_dir=(-0.06466865696139155, -0.19759867404852308, -0.9781476007336907)), keep=Keep.TOP, mode=Mode.PRIVATE)
    chamfer3_piece_6 = split(chamfer3_piece_6, bisect_by=Plane(origin=(11.633502975, 14.930136998, 10), z_dir=(0, 0, 1)), keep=Keep.TOP, mode=Mode.PRIVATE)
    add(chamfer3_piece_6, mode=Mode.SUBTRACT)
    with BuildSketch(Plane(origin=(23.688904863, 21, 12), x_dir=(0, -0.008660176093277927, -0.9999624999718906), z_dir=(-1, 0, 0))) as chamfer3_piece_7_section:
        Polygon((CHAMFER3_SIZE * 0.999962499972, -CHAMFER3_SIZE * 0.00866017609328), (-CHAMFER3_SIZE_2 * 0.00866017609382, -CHAMFER3_SIZE_2 * 0.999962500034), (0, 0), align=None)
    chamfer3_piece_7 = extrude(amount=47.377809727, mode=Mode.PRIVATE)
    chamfer3_piece_7 = split(chamfer3_piece_7, bisect_by=Plane(origin=(0, 21.388678307, 10), z_dir=(0, 0, 1)), keep=Keep.TOP, mode=Mode.PRIVATE)
    add(chamfer3_piece_7, mode=Mode.SUBTRACT)
    with BuildSketch(Plane(origin=(-12, 9.311095137, 12), x_dir=(-0.008660176093277927, 0, -0.9999624999718906), z_dir=(0, 1, 0))) as chamfer3_piece_8_section:
        Polygon((CHAMFER3_SIZE * 0.999962499972, -CHAMFER3_SIZE * 0.00866017609328), (-CHAMFER3_SIZE_2 * 0.00866017609382, -CHAMFER3_SIZE_2 * 0.999962500034), (0, 0), align=None)
    chamfer3_piece_8 = extrude(amount=35.377809727, mode=Mode.PRIVATE)
    chamfer3_piece_8 = split(chamfer3_piece_8, bisect_by=Plane(origin=(-11.705305569, 15.149533813, 12.066374843), z_dir=(0.06466865696139155, -0.19759867404852308, -0.9781476007336907)), keep=Keep.TOP, mode=Mode.PRIVATE)
    chamfer3_piece_8 = split(chamfer3_piece_8, bisect_by=Plane(origin=(-11.633502975, 14.930136998, 10), z_dir=(0, 0, 1)), keep=Keep.TOP, mode=Mode.PRIVATE)
    add(chamfer3_piece_8, mode=Mode.SUBTRACT)
    with BuildSketch(Plane(origin=(-12, 9.311095137, 12), x_dir=(-0.008660176093277927, 0, -0.9999624999718906), z_dir=(0, 1, 0))) as chamfer3_piece_9_section:
        Polygon((CHAMFER3_SIZE * 0.999962499972, -CHAMFER3_SIZE * 0.00866017609328), (-CHAMFER3_SIZE_2 * 0.00866017609382, -CHAMFER3_SIZE_2 * 0.999962500034), (0, 0), align=None)
    chamfer3_piece_9 = extrude(amount=35.377809727, mode=Mode.PRIVATE)
    chamfer3_piece_9 = split(chamfer3_piece_9, bisect_by=Plane(origin=(-11.75860092, 36.766980835, 7.695842826), z_dir=(-0.06466865696139155, 0.19759867404852308, 0.9781476007336907)), keep=Keep.TOP, mode=Mode.PRIVATE)
    chamfer3_piece_9 = split(chamfer3_piece_9, bisect_by=Plane(origin=(-11.856026743, 37.064670851, 10), z_dir=(0, 0, -1)), keep=Keep.TOP, mode=Mode.PRIVATE)
    add(chamfer3_piece_9, mode=Mode.SUBTRACT)
    with BuildSketch(Plane(origin=(-12, 9.311095137, 12), x_dir=(-0.008660176093277927, 0, -0.9999624999718906), z_dir=(0, 1, 0))) as chamfer3_piece_10_section:
        Polygon((CHAMFER3_SIZE * 0.999962499972, -CHAMFER3_SIZE * 0.00866017609328), (-CHAMFER3_SIZE_2 * 0.00866017609382, -CHAMFER3_SIZE_2 * 0.999962500034), (0, 0), align=None)
    chamfer3_piece_10 = extrude(amount=35.377809727, mode=Mode.PRIVATE)
    chamfer3_piece_10 = split(chamfer3_piece_10, bisect_by=Plane(origin=(-11.440207801, 31.525379387, 8.775765274), z_dir=(-0.06466865696139155, 0.19759867404852308, 0.9781476007336907)), keep=Keep.TOP, mode=Mode.PRIVATE)
    chamfer3_piece_10 = split(chamfer3_piece_10, bisect_by=Plane(origin=(-11.602096163, 32.020038273, 10), z_dir=(0, 0, 1)), keep=Keep.TOP, mode=Mode.PRIVATE)
    add(chamfer3_piece_10, mode=Mode.SUBTRACT)

    # Sketch9 → AVA name print (cut)
    with BuildSketch(Plane.XY.offset(12)):
        Polygon((-8.466666667, 29.233333333), (-6.404273504, 29.233333333), (-6.404273504, 28.799145299), (-8.086752137, 28.799145299), (-8.086752137, 27.496581197), (-6.404273504, 27.496581197), (-6.404273504, 27.062393162), (-8.086752137, 27.062393162), (-8.086752137, 25), (-8.466666667, 25), align=None)
        with Locations((-5.45448718, 27.116666667)):
            Rectangle(SKETCH9_W, SKETCH9_H)
        Polygon((-4.179059829, 25), (-4.179059829, 29.233333333), (-4.09934562, 29.233333333), (-1.302564103, 25.901448985), (-1.302564103, 29.233333333), (-0.922649573, 29.233333333), (-0.922649573, 25), (-1.00914797, 25), (-3.799145299, 28.324252137), (-3.799145299, 25), align=None)
        Polygon((0.162820513, 29.233333333), (0.542735043, 29.233333333), (0.542735043, 25.434188034), (2.170940171, 25.434188034), (2.170940171, 25), (0.162820513, 25), align=None)
        Polygon((2.876495726, 29.233333333), (5.264529915, 29.233333333), (5.264529915, 28.799145299), (3.256410256, 28.799145299), (3.256410256, 27.496581197), (5.264529915, 27.496581197), (5.264529915, 27.062393162), (3.256410256, 27.062393162), (3.256410256, 25.434188034), (5.264529915, 25.434188034), (5.264529915, 25), (2.876495726, 25), align=None)
        Polygon((5.698717949, 29.233333333), (6.133754006, 29.233333333), (7.246360844, 27.414322917), (8.357271635, 29.233333333), (8.792307692, 29.233333333), (7.435470085, 27.012359776), (7.435470085, 25), (7.055555556, 25), (7.055555556, 27.012359776), align=None)
    extrude(amount=-AVA_NAME_PRINT_DEPTH, mode=Mode.SUBTRACT)


solid = part.part
